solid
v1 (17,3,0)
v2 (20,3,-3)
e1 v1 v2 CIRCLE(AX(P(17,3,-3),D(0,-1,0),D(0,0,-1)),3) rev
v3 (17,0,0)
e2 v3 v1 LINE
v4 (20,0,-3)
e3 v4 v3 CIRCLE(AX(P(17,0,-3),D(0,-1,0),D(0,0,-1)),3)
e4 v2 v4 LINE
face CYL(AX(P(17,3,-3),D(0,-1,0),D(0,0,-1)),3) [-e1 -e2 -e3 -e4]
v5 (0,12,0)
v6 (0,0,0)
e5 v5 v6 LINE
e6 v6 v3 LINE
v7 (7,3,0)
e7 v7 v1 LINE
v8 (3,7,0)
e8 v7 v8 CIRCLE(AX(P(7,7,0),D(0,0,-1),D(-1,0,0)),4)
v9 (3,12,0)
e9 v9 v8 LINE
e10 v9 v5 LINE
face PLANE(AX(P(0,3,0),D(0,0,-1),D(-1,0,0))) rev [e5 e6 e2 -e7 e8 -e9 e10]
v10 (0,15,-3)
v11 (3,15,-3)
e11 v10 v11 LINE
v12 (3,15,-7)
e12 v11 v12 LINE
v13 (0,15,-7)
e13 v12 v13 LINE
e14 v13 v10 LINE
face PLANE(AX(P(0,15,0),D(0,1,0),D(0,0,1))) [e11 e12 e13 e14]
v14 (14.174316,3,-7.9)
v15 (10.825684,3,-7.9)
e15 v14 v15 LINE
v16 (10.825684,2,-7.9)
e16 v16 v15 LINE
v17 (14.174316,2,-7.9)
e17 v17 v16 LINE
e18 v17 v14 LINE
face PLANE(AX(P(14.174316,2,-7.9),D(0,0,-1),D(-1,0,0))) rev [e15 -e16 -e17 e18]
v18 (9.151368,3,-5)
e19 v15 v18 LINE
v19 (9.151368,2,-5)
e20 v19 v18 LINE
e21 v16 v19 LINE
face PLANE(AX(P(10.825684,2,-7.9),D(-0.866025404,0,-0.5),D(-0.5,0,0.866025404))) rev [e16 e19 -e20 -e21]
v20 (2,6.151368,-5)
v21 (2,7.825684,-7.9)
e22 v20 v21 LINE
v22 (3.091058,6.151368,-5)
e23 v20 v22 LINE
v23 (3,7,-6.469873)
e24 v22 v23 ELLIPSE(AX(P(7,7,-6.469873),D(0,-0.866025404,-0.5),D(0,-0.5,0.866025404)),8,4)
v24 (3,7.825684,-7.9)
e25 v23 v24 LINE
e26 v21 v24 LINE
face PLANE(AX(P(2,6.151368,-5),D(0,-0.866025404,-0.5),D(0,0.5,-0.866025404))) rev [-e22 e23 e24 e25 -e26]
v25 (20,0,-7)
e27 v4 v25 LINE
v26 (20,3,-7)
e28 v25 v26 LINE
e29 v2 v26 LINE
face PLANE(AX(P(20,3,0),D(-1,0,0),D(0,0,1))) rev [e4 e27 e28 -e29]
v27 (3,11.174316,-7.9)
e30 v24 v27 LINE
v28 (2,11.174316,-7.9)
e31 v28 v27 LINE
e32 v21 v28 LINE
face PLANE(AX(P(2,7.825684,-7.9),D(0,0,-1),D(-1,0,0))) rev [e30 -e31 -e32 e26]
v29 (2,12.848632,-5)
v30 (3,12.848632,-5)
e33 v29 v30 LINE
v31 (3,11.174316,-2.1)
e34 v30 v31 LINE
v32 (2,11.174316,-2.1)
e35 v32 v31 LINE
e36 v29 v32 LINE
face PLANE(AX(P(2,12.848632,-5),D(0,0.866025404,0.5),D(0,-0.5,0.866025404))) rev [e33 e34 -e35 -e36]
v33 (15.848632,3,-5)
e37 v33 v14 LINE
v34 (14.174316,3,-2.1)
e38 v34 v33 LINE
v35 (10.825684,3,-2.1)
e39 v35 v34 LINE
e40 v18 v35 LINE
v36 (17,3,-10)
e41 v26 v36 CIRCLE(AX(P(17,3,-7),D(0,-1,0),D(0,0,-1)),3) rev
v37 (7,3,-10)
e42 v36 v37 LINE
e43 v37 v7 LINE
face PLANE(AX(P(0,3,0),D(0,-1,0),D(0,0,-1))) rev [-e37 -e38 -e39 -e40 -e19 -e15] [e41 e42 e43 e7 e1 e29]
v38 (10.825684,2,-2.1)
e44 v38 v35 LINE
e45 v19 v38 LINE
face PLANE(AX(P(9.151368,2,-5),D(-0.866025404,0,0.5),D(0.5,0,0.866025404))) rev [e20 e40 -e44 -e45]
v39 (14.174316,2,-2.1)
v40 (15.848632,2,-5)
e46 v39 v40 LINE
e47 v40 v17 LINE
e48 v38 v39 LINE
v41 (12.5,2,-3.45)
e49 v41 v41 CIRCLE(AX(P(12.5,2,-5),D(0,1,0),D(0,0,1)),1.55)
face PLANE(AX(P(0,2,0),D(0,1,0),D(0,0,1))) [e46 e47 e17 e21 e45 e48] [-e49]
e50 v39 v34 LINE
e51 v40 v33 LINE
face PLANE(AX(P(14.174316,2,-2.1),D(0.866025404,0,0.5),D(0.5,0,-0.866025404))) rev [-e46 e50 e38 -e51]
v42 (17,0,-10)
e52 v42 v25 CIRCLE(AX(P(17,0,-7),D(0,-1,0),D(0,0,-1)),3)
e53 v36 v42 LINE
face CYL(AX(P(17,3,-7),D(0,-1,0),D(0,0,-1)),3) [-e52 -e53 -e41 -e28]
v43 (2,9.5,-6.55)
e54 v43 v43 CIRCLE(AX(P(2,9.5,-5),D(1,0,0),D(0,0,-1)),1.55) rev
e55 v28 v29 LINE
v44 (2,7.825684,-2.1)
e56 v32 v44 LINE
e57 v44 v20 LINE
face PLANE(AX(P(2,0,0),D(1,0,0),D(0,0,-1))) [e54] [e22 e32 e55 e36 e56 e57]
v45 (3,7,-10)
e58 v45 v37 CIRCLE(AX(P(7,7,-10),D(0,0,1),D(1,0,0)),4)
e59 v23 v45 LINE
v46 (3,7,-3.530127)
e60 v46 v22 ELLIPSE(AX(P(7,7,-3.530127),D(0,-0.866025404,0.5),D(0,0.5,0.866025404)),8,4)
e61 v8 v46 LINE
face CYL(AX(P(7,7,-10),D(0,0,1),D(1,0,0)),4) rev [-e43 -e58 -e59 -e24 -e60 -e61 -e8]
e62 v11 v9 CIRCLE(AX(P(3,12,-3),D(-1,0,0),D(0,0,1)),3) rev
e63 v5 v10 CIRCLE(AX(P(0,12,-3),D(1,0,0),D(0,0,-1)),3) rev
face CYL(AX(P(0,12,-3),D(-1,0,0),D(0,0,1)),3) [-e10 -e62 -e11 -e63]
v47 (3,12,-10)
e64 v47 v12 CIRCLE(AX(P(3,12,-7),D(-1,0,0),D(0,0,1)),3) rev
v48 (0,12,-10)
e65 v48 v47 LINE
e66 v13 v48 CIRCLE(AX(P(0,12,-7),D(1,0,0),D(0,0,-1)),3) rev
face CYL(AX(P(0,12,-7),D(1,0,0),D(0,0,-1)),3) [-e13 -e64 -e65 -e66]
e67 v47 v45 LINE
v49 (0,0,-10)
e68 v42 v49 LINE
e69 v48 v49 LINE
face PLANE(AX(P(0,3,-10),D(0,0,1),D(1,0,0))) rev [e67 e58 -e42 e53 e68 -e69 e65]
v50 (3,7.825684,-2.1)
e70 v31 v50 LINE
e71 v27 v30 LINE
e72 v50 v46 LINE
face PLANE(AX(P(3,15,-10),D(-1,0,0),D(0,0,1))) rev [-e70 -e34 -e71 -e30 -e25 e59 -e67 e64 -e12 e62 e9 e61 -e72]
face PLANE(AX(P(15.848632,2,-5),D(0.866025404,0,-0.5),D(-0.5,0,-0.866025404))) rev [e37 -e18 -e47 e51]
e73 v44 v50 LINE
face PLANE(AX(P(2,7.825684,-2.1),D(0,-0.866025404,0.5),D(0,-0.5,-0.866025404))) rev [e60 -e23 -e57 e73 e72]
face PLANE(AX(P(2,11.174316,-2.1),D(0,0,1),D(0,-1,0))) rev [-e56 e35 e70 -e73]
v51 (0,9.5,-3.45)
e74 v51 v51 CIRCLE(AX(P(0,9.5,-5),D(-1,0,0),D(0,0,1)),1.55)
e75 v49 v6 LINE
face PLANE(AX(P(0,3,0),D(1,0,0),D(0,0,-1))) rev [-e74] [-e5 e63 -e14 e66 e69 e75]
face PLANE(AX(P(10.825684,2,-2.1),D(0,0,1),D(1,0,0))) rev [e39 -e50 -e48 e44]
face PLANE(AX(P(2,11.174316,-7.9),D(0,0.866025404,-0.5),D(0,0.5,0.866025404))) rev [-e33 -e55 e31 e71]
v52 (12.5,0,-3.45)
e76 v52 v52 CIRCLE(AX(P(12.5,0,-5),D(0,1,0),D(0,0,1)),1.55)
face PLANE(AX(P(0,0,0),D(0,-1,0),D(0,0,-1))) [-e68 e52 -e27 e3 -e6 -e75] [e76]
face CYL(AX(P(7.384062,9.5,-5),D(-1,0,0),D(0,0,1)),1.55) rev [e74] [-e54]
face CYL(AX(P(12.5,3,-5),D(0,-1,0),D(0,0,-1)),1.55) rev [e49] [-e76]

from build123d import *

# Parameters (mm, degrees)
CROQUIS1_W              = 20
CROQUIS1_H              = 10
CROQUIS1_R              = 1.55
SALIENTE_EXTRUIR1_DEPTH = 3
CROQUIS2_W              = 3
CROQUIS2_H              = 10
SALIENTE_EXTRUIR2_DEPTH = 12
CROQUIS3_R              = 1.55
CORTAR_EXTRUIR1_DEPTH   = 3
CORTAR_EXTRUIR3_DEPTH   = 1
REDONDEO1_R             = 3
REDONDEO2_R             = 4
CORTAR_EXTRUIR4_DEPTH   = 1


with BuildPart() as part:
    # Croquis1 → Saliente-Extruir1 (new body)
    with BuildSketch(Plane(origin=(0, 0, 0), x_dir=(1, 0, 0), z_dir=(0, 1, 0))):
        with Locations((10, 5)):
            Rectangle(CROQUIS1_W, CROQUIS1_H)
        with Locations(Location((12.5, 5, 0), (0, 0, 270))):
            Circle(CROQUIS1_R, mode=Mode.SUBTRACT)
    extrude(amount=SALIENTE_EXTRUIR1_DEPTH)

    # Croquis2 → Saliente-Extruir2 (add)
    with BuildSketch(Plane(origin=(0, 3, 0), x_dir=(1, 0, 0), z_dir=(0, 1, 0))):
        with Locations((1.5, 5)):
            Rectangle(CROQUIS2_W, CROQUIS2_H)
    extrude(amount=SALIENTE_EXTRUIR2_DEPTH)

    # Croquis3 → Cortar-Extruir1 (cut)
    with BuildSketch(Plane.ZY):
        with Locations((-5, 9.5)):
            Circle(CROQUIS3_R)
    extrude(amount=-CORTAR_EXTRUIR1_DEPTH, mode=Mode.SUBTRACT)

    # Croquis5 → Cortar-Extruir3 (cut)
    with BuildSketch(Plane(origin=(3, 0, 0), x_dir=(0, 0, -1), z_dir=(1, 0, 0))):
        Polygon((7.9, 11.174315781), (5, 12.848631561), (2.1, 11.174315781), (2.1, 7.825684219), (5, 6.151368439), (7.9, 7.825684219), align=None)
    extrude(amount=-CORTAR_EXTRUIR3_DEPTH, mode=Mode.SUBTRACT)

    # Redondeo1
    redondeo1_edges = [part.edges().sort_by_distance(p)[0] for p in [
        (1.5, 15, 0),
        (1.5, 15, -10),
        (20, 1.5, -10),
        (20, 1.5, 0),
    ]]
    fillet(redondeo1_edges, radius=REDONDEO1_R)

    # Redondeo2
    # the kernel refuses this fillet: 4 mm, written as the material it adds along each edge
    with BuildSketch(Plane(origin=(3, 3, -10), x_dir=(0, 1, 0), z_dir=(0, 0, 1))) as redondeo2_piece_1_section:
        with BuildLine():
            CenterArc((REDONDEO2_R, -REDONDEO2_R), REDONDEO2_R, 90, 90)
            Line((0, -REDONDEO2_R), (0, 0))
            Line((0, 0), (REDONDEO2_R, 0))
        make_face()
    redondeo2_piece_1 = extrude(amount=10, mode=Mode.PRIVATE)
    redondeo2_piece_1 = split(redondeo2_piece_1, bisect_by=Plane(origin=(3.346509798, 4.243965629, -8.303718576), z_dir=(0, 0.8660254037844384, -0.5000000000000007)), keep=Keep.TOP, mode=Mode.PRIVATE)
    redondeo2_piece_1 = split(redondeo2_piece_1, bisect_by=Plane(origin=(3.346509798, 7.41640276, -7.191103718), z_dir=(0, -0.8660254037844387, -0.5)), keep=Keep.TOP, mode=Mode.PRIVATE)
    add(redondeo2_piece_1)
    with BuildSketch(Plane(origin=(3, 3, -10), x_dir=(0, 1, 0), z_dir=(0, 0, 1))) as redondeo2_piece_2_section:
        with BuildLine():
            CenterArc((REDONDEO2_R, -REDONDEO2_R), REDONDEO2_R, 90, 90)
            Line((0, -REDONDEO2_R), (0, 0))
            Line((0, 0), (REDONDEO2_R, 0))
        make_face()
    redondeo2_piece_2 = extrude(amount=10, mode=Mode.PRIVATE)
    redondeo2_piece_2 = split(redondeo2_piece_2, bisect_by=Plane(origin=(4.081067975, 5.513393982, -6.105004173), z_dir=(0, -0.8660254037844384, 0.5000000000000007)), keep=Keep.TOP, mode=Mode.PRIVATE)
    redondeo2_piece_2 = split(redondeo2_piece_2, bisect_by=Plane(origin=(4.081067975, 5.513393982, -3.894995827), z_dir=(0, -0.8660254037844387, -0.5)), keep=Keep.TOP, mode=Mode.PRIVATE)
    add(redondeo2_piece_2)
    with BuildSketch(Plane(origin=(3, 3, -10), x_dir=(0, 1, 0), z_dir=(0, 0, 1))) as redondeo2_piece_3_section:
        with BuildLine():
            CenterArc((REDONDEO2_R, -REDONDEO2_R), REDONDEO2_R, 90, 90)
            Line((0, -REDONDEO2_R), (0, 0))
            Line((0, 0), (REDONDEO2_R, 0))
        make_face()
    redondeo2_piece_3 = extrude(amount=10, mode=Mode.PRIVATE)
    redondeo2_piece_3 = split(redondeo2_piece_3, bisect_by=Plane(origin=(3.346509798, 7.41640276, -2.808896282), z_dir=(0, -0.8660254037844384, 0.5000000000000007)), keep=Keep.TOP, mode=Mode.PRIVATE)
    redondeo2_piece_3 = split(redondeo2_piece_3, bisect_by=Plane(origin=(3.346509798, 4.243965629, -1.696281424), z_dir=(0, 0.8660254037844387, 0.5)), keep=Keep.TOP, mode=Mode.PRIVATE)
    add(redondeo2_piece_3)

    # Croquis6 → Cortar-Extruir4 (cut)
    with BuildSketch(Plane(origin=(0, 3, 0), x_dir=(1, 0, 0), z_dir=(0, 1, 0))):
        Polygon((14.174315781, 7.9), (10.825684219, 7.9), (9.151368439, 5), (10.825684219, 2.1), (14.174315781, 2.1), (15.848631561, 5), align=None)
    extrude(amount=-CORTAR_EXTRUIR4_DEPTH, mode=Mode.SUBTRACT)


solid = part.part
